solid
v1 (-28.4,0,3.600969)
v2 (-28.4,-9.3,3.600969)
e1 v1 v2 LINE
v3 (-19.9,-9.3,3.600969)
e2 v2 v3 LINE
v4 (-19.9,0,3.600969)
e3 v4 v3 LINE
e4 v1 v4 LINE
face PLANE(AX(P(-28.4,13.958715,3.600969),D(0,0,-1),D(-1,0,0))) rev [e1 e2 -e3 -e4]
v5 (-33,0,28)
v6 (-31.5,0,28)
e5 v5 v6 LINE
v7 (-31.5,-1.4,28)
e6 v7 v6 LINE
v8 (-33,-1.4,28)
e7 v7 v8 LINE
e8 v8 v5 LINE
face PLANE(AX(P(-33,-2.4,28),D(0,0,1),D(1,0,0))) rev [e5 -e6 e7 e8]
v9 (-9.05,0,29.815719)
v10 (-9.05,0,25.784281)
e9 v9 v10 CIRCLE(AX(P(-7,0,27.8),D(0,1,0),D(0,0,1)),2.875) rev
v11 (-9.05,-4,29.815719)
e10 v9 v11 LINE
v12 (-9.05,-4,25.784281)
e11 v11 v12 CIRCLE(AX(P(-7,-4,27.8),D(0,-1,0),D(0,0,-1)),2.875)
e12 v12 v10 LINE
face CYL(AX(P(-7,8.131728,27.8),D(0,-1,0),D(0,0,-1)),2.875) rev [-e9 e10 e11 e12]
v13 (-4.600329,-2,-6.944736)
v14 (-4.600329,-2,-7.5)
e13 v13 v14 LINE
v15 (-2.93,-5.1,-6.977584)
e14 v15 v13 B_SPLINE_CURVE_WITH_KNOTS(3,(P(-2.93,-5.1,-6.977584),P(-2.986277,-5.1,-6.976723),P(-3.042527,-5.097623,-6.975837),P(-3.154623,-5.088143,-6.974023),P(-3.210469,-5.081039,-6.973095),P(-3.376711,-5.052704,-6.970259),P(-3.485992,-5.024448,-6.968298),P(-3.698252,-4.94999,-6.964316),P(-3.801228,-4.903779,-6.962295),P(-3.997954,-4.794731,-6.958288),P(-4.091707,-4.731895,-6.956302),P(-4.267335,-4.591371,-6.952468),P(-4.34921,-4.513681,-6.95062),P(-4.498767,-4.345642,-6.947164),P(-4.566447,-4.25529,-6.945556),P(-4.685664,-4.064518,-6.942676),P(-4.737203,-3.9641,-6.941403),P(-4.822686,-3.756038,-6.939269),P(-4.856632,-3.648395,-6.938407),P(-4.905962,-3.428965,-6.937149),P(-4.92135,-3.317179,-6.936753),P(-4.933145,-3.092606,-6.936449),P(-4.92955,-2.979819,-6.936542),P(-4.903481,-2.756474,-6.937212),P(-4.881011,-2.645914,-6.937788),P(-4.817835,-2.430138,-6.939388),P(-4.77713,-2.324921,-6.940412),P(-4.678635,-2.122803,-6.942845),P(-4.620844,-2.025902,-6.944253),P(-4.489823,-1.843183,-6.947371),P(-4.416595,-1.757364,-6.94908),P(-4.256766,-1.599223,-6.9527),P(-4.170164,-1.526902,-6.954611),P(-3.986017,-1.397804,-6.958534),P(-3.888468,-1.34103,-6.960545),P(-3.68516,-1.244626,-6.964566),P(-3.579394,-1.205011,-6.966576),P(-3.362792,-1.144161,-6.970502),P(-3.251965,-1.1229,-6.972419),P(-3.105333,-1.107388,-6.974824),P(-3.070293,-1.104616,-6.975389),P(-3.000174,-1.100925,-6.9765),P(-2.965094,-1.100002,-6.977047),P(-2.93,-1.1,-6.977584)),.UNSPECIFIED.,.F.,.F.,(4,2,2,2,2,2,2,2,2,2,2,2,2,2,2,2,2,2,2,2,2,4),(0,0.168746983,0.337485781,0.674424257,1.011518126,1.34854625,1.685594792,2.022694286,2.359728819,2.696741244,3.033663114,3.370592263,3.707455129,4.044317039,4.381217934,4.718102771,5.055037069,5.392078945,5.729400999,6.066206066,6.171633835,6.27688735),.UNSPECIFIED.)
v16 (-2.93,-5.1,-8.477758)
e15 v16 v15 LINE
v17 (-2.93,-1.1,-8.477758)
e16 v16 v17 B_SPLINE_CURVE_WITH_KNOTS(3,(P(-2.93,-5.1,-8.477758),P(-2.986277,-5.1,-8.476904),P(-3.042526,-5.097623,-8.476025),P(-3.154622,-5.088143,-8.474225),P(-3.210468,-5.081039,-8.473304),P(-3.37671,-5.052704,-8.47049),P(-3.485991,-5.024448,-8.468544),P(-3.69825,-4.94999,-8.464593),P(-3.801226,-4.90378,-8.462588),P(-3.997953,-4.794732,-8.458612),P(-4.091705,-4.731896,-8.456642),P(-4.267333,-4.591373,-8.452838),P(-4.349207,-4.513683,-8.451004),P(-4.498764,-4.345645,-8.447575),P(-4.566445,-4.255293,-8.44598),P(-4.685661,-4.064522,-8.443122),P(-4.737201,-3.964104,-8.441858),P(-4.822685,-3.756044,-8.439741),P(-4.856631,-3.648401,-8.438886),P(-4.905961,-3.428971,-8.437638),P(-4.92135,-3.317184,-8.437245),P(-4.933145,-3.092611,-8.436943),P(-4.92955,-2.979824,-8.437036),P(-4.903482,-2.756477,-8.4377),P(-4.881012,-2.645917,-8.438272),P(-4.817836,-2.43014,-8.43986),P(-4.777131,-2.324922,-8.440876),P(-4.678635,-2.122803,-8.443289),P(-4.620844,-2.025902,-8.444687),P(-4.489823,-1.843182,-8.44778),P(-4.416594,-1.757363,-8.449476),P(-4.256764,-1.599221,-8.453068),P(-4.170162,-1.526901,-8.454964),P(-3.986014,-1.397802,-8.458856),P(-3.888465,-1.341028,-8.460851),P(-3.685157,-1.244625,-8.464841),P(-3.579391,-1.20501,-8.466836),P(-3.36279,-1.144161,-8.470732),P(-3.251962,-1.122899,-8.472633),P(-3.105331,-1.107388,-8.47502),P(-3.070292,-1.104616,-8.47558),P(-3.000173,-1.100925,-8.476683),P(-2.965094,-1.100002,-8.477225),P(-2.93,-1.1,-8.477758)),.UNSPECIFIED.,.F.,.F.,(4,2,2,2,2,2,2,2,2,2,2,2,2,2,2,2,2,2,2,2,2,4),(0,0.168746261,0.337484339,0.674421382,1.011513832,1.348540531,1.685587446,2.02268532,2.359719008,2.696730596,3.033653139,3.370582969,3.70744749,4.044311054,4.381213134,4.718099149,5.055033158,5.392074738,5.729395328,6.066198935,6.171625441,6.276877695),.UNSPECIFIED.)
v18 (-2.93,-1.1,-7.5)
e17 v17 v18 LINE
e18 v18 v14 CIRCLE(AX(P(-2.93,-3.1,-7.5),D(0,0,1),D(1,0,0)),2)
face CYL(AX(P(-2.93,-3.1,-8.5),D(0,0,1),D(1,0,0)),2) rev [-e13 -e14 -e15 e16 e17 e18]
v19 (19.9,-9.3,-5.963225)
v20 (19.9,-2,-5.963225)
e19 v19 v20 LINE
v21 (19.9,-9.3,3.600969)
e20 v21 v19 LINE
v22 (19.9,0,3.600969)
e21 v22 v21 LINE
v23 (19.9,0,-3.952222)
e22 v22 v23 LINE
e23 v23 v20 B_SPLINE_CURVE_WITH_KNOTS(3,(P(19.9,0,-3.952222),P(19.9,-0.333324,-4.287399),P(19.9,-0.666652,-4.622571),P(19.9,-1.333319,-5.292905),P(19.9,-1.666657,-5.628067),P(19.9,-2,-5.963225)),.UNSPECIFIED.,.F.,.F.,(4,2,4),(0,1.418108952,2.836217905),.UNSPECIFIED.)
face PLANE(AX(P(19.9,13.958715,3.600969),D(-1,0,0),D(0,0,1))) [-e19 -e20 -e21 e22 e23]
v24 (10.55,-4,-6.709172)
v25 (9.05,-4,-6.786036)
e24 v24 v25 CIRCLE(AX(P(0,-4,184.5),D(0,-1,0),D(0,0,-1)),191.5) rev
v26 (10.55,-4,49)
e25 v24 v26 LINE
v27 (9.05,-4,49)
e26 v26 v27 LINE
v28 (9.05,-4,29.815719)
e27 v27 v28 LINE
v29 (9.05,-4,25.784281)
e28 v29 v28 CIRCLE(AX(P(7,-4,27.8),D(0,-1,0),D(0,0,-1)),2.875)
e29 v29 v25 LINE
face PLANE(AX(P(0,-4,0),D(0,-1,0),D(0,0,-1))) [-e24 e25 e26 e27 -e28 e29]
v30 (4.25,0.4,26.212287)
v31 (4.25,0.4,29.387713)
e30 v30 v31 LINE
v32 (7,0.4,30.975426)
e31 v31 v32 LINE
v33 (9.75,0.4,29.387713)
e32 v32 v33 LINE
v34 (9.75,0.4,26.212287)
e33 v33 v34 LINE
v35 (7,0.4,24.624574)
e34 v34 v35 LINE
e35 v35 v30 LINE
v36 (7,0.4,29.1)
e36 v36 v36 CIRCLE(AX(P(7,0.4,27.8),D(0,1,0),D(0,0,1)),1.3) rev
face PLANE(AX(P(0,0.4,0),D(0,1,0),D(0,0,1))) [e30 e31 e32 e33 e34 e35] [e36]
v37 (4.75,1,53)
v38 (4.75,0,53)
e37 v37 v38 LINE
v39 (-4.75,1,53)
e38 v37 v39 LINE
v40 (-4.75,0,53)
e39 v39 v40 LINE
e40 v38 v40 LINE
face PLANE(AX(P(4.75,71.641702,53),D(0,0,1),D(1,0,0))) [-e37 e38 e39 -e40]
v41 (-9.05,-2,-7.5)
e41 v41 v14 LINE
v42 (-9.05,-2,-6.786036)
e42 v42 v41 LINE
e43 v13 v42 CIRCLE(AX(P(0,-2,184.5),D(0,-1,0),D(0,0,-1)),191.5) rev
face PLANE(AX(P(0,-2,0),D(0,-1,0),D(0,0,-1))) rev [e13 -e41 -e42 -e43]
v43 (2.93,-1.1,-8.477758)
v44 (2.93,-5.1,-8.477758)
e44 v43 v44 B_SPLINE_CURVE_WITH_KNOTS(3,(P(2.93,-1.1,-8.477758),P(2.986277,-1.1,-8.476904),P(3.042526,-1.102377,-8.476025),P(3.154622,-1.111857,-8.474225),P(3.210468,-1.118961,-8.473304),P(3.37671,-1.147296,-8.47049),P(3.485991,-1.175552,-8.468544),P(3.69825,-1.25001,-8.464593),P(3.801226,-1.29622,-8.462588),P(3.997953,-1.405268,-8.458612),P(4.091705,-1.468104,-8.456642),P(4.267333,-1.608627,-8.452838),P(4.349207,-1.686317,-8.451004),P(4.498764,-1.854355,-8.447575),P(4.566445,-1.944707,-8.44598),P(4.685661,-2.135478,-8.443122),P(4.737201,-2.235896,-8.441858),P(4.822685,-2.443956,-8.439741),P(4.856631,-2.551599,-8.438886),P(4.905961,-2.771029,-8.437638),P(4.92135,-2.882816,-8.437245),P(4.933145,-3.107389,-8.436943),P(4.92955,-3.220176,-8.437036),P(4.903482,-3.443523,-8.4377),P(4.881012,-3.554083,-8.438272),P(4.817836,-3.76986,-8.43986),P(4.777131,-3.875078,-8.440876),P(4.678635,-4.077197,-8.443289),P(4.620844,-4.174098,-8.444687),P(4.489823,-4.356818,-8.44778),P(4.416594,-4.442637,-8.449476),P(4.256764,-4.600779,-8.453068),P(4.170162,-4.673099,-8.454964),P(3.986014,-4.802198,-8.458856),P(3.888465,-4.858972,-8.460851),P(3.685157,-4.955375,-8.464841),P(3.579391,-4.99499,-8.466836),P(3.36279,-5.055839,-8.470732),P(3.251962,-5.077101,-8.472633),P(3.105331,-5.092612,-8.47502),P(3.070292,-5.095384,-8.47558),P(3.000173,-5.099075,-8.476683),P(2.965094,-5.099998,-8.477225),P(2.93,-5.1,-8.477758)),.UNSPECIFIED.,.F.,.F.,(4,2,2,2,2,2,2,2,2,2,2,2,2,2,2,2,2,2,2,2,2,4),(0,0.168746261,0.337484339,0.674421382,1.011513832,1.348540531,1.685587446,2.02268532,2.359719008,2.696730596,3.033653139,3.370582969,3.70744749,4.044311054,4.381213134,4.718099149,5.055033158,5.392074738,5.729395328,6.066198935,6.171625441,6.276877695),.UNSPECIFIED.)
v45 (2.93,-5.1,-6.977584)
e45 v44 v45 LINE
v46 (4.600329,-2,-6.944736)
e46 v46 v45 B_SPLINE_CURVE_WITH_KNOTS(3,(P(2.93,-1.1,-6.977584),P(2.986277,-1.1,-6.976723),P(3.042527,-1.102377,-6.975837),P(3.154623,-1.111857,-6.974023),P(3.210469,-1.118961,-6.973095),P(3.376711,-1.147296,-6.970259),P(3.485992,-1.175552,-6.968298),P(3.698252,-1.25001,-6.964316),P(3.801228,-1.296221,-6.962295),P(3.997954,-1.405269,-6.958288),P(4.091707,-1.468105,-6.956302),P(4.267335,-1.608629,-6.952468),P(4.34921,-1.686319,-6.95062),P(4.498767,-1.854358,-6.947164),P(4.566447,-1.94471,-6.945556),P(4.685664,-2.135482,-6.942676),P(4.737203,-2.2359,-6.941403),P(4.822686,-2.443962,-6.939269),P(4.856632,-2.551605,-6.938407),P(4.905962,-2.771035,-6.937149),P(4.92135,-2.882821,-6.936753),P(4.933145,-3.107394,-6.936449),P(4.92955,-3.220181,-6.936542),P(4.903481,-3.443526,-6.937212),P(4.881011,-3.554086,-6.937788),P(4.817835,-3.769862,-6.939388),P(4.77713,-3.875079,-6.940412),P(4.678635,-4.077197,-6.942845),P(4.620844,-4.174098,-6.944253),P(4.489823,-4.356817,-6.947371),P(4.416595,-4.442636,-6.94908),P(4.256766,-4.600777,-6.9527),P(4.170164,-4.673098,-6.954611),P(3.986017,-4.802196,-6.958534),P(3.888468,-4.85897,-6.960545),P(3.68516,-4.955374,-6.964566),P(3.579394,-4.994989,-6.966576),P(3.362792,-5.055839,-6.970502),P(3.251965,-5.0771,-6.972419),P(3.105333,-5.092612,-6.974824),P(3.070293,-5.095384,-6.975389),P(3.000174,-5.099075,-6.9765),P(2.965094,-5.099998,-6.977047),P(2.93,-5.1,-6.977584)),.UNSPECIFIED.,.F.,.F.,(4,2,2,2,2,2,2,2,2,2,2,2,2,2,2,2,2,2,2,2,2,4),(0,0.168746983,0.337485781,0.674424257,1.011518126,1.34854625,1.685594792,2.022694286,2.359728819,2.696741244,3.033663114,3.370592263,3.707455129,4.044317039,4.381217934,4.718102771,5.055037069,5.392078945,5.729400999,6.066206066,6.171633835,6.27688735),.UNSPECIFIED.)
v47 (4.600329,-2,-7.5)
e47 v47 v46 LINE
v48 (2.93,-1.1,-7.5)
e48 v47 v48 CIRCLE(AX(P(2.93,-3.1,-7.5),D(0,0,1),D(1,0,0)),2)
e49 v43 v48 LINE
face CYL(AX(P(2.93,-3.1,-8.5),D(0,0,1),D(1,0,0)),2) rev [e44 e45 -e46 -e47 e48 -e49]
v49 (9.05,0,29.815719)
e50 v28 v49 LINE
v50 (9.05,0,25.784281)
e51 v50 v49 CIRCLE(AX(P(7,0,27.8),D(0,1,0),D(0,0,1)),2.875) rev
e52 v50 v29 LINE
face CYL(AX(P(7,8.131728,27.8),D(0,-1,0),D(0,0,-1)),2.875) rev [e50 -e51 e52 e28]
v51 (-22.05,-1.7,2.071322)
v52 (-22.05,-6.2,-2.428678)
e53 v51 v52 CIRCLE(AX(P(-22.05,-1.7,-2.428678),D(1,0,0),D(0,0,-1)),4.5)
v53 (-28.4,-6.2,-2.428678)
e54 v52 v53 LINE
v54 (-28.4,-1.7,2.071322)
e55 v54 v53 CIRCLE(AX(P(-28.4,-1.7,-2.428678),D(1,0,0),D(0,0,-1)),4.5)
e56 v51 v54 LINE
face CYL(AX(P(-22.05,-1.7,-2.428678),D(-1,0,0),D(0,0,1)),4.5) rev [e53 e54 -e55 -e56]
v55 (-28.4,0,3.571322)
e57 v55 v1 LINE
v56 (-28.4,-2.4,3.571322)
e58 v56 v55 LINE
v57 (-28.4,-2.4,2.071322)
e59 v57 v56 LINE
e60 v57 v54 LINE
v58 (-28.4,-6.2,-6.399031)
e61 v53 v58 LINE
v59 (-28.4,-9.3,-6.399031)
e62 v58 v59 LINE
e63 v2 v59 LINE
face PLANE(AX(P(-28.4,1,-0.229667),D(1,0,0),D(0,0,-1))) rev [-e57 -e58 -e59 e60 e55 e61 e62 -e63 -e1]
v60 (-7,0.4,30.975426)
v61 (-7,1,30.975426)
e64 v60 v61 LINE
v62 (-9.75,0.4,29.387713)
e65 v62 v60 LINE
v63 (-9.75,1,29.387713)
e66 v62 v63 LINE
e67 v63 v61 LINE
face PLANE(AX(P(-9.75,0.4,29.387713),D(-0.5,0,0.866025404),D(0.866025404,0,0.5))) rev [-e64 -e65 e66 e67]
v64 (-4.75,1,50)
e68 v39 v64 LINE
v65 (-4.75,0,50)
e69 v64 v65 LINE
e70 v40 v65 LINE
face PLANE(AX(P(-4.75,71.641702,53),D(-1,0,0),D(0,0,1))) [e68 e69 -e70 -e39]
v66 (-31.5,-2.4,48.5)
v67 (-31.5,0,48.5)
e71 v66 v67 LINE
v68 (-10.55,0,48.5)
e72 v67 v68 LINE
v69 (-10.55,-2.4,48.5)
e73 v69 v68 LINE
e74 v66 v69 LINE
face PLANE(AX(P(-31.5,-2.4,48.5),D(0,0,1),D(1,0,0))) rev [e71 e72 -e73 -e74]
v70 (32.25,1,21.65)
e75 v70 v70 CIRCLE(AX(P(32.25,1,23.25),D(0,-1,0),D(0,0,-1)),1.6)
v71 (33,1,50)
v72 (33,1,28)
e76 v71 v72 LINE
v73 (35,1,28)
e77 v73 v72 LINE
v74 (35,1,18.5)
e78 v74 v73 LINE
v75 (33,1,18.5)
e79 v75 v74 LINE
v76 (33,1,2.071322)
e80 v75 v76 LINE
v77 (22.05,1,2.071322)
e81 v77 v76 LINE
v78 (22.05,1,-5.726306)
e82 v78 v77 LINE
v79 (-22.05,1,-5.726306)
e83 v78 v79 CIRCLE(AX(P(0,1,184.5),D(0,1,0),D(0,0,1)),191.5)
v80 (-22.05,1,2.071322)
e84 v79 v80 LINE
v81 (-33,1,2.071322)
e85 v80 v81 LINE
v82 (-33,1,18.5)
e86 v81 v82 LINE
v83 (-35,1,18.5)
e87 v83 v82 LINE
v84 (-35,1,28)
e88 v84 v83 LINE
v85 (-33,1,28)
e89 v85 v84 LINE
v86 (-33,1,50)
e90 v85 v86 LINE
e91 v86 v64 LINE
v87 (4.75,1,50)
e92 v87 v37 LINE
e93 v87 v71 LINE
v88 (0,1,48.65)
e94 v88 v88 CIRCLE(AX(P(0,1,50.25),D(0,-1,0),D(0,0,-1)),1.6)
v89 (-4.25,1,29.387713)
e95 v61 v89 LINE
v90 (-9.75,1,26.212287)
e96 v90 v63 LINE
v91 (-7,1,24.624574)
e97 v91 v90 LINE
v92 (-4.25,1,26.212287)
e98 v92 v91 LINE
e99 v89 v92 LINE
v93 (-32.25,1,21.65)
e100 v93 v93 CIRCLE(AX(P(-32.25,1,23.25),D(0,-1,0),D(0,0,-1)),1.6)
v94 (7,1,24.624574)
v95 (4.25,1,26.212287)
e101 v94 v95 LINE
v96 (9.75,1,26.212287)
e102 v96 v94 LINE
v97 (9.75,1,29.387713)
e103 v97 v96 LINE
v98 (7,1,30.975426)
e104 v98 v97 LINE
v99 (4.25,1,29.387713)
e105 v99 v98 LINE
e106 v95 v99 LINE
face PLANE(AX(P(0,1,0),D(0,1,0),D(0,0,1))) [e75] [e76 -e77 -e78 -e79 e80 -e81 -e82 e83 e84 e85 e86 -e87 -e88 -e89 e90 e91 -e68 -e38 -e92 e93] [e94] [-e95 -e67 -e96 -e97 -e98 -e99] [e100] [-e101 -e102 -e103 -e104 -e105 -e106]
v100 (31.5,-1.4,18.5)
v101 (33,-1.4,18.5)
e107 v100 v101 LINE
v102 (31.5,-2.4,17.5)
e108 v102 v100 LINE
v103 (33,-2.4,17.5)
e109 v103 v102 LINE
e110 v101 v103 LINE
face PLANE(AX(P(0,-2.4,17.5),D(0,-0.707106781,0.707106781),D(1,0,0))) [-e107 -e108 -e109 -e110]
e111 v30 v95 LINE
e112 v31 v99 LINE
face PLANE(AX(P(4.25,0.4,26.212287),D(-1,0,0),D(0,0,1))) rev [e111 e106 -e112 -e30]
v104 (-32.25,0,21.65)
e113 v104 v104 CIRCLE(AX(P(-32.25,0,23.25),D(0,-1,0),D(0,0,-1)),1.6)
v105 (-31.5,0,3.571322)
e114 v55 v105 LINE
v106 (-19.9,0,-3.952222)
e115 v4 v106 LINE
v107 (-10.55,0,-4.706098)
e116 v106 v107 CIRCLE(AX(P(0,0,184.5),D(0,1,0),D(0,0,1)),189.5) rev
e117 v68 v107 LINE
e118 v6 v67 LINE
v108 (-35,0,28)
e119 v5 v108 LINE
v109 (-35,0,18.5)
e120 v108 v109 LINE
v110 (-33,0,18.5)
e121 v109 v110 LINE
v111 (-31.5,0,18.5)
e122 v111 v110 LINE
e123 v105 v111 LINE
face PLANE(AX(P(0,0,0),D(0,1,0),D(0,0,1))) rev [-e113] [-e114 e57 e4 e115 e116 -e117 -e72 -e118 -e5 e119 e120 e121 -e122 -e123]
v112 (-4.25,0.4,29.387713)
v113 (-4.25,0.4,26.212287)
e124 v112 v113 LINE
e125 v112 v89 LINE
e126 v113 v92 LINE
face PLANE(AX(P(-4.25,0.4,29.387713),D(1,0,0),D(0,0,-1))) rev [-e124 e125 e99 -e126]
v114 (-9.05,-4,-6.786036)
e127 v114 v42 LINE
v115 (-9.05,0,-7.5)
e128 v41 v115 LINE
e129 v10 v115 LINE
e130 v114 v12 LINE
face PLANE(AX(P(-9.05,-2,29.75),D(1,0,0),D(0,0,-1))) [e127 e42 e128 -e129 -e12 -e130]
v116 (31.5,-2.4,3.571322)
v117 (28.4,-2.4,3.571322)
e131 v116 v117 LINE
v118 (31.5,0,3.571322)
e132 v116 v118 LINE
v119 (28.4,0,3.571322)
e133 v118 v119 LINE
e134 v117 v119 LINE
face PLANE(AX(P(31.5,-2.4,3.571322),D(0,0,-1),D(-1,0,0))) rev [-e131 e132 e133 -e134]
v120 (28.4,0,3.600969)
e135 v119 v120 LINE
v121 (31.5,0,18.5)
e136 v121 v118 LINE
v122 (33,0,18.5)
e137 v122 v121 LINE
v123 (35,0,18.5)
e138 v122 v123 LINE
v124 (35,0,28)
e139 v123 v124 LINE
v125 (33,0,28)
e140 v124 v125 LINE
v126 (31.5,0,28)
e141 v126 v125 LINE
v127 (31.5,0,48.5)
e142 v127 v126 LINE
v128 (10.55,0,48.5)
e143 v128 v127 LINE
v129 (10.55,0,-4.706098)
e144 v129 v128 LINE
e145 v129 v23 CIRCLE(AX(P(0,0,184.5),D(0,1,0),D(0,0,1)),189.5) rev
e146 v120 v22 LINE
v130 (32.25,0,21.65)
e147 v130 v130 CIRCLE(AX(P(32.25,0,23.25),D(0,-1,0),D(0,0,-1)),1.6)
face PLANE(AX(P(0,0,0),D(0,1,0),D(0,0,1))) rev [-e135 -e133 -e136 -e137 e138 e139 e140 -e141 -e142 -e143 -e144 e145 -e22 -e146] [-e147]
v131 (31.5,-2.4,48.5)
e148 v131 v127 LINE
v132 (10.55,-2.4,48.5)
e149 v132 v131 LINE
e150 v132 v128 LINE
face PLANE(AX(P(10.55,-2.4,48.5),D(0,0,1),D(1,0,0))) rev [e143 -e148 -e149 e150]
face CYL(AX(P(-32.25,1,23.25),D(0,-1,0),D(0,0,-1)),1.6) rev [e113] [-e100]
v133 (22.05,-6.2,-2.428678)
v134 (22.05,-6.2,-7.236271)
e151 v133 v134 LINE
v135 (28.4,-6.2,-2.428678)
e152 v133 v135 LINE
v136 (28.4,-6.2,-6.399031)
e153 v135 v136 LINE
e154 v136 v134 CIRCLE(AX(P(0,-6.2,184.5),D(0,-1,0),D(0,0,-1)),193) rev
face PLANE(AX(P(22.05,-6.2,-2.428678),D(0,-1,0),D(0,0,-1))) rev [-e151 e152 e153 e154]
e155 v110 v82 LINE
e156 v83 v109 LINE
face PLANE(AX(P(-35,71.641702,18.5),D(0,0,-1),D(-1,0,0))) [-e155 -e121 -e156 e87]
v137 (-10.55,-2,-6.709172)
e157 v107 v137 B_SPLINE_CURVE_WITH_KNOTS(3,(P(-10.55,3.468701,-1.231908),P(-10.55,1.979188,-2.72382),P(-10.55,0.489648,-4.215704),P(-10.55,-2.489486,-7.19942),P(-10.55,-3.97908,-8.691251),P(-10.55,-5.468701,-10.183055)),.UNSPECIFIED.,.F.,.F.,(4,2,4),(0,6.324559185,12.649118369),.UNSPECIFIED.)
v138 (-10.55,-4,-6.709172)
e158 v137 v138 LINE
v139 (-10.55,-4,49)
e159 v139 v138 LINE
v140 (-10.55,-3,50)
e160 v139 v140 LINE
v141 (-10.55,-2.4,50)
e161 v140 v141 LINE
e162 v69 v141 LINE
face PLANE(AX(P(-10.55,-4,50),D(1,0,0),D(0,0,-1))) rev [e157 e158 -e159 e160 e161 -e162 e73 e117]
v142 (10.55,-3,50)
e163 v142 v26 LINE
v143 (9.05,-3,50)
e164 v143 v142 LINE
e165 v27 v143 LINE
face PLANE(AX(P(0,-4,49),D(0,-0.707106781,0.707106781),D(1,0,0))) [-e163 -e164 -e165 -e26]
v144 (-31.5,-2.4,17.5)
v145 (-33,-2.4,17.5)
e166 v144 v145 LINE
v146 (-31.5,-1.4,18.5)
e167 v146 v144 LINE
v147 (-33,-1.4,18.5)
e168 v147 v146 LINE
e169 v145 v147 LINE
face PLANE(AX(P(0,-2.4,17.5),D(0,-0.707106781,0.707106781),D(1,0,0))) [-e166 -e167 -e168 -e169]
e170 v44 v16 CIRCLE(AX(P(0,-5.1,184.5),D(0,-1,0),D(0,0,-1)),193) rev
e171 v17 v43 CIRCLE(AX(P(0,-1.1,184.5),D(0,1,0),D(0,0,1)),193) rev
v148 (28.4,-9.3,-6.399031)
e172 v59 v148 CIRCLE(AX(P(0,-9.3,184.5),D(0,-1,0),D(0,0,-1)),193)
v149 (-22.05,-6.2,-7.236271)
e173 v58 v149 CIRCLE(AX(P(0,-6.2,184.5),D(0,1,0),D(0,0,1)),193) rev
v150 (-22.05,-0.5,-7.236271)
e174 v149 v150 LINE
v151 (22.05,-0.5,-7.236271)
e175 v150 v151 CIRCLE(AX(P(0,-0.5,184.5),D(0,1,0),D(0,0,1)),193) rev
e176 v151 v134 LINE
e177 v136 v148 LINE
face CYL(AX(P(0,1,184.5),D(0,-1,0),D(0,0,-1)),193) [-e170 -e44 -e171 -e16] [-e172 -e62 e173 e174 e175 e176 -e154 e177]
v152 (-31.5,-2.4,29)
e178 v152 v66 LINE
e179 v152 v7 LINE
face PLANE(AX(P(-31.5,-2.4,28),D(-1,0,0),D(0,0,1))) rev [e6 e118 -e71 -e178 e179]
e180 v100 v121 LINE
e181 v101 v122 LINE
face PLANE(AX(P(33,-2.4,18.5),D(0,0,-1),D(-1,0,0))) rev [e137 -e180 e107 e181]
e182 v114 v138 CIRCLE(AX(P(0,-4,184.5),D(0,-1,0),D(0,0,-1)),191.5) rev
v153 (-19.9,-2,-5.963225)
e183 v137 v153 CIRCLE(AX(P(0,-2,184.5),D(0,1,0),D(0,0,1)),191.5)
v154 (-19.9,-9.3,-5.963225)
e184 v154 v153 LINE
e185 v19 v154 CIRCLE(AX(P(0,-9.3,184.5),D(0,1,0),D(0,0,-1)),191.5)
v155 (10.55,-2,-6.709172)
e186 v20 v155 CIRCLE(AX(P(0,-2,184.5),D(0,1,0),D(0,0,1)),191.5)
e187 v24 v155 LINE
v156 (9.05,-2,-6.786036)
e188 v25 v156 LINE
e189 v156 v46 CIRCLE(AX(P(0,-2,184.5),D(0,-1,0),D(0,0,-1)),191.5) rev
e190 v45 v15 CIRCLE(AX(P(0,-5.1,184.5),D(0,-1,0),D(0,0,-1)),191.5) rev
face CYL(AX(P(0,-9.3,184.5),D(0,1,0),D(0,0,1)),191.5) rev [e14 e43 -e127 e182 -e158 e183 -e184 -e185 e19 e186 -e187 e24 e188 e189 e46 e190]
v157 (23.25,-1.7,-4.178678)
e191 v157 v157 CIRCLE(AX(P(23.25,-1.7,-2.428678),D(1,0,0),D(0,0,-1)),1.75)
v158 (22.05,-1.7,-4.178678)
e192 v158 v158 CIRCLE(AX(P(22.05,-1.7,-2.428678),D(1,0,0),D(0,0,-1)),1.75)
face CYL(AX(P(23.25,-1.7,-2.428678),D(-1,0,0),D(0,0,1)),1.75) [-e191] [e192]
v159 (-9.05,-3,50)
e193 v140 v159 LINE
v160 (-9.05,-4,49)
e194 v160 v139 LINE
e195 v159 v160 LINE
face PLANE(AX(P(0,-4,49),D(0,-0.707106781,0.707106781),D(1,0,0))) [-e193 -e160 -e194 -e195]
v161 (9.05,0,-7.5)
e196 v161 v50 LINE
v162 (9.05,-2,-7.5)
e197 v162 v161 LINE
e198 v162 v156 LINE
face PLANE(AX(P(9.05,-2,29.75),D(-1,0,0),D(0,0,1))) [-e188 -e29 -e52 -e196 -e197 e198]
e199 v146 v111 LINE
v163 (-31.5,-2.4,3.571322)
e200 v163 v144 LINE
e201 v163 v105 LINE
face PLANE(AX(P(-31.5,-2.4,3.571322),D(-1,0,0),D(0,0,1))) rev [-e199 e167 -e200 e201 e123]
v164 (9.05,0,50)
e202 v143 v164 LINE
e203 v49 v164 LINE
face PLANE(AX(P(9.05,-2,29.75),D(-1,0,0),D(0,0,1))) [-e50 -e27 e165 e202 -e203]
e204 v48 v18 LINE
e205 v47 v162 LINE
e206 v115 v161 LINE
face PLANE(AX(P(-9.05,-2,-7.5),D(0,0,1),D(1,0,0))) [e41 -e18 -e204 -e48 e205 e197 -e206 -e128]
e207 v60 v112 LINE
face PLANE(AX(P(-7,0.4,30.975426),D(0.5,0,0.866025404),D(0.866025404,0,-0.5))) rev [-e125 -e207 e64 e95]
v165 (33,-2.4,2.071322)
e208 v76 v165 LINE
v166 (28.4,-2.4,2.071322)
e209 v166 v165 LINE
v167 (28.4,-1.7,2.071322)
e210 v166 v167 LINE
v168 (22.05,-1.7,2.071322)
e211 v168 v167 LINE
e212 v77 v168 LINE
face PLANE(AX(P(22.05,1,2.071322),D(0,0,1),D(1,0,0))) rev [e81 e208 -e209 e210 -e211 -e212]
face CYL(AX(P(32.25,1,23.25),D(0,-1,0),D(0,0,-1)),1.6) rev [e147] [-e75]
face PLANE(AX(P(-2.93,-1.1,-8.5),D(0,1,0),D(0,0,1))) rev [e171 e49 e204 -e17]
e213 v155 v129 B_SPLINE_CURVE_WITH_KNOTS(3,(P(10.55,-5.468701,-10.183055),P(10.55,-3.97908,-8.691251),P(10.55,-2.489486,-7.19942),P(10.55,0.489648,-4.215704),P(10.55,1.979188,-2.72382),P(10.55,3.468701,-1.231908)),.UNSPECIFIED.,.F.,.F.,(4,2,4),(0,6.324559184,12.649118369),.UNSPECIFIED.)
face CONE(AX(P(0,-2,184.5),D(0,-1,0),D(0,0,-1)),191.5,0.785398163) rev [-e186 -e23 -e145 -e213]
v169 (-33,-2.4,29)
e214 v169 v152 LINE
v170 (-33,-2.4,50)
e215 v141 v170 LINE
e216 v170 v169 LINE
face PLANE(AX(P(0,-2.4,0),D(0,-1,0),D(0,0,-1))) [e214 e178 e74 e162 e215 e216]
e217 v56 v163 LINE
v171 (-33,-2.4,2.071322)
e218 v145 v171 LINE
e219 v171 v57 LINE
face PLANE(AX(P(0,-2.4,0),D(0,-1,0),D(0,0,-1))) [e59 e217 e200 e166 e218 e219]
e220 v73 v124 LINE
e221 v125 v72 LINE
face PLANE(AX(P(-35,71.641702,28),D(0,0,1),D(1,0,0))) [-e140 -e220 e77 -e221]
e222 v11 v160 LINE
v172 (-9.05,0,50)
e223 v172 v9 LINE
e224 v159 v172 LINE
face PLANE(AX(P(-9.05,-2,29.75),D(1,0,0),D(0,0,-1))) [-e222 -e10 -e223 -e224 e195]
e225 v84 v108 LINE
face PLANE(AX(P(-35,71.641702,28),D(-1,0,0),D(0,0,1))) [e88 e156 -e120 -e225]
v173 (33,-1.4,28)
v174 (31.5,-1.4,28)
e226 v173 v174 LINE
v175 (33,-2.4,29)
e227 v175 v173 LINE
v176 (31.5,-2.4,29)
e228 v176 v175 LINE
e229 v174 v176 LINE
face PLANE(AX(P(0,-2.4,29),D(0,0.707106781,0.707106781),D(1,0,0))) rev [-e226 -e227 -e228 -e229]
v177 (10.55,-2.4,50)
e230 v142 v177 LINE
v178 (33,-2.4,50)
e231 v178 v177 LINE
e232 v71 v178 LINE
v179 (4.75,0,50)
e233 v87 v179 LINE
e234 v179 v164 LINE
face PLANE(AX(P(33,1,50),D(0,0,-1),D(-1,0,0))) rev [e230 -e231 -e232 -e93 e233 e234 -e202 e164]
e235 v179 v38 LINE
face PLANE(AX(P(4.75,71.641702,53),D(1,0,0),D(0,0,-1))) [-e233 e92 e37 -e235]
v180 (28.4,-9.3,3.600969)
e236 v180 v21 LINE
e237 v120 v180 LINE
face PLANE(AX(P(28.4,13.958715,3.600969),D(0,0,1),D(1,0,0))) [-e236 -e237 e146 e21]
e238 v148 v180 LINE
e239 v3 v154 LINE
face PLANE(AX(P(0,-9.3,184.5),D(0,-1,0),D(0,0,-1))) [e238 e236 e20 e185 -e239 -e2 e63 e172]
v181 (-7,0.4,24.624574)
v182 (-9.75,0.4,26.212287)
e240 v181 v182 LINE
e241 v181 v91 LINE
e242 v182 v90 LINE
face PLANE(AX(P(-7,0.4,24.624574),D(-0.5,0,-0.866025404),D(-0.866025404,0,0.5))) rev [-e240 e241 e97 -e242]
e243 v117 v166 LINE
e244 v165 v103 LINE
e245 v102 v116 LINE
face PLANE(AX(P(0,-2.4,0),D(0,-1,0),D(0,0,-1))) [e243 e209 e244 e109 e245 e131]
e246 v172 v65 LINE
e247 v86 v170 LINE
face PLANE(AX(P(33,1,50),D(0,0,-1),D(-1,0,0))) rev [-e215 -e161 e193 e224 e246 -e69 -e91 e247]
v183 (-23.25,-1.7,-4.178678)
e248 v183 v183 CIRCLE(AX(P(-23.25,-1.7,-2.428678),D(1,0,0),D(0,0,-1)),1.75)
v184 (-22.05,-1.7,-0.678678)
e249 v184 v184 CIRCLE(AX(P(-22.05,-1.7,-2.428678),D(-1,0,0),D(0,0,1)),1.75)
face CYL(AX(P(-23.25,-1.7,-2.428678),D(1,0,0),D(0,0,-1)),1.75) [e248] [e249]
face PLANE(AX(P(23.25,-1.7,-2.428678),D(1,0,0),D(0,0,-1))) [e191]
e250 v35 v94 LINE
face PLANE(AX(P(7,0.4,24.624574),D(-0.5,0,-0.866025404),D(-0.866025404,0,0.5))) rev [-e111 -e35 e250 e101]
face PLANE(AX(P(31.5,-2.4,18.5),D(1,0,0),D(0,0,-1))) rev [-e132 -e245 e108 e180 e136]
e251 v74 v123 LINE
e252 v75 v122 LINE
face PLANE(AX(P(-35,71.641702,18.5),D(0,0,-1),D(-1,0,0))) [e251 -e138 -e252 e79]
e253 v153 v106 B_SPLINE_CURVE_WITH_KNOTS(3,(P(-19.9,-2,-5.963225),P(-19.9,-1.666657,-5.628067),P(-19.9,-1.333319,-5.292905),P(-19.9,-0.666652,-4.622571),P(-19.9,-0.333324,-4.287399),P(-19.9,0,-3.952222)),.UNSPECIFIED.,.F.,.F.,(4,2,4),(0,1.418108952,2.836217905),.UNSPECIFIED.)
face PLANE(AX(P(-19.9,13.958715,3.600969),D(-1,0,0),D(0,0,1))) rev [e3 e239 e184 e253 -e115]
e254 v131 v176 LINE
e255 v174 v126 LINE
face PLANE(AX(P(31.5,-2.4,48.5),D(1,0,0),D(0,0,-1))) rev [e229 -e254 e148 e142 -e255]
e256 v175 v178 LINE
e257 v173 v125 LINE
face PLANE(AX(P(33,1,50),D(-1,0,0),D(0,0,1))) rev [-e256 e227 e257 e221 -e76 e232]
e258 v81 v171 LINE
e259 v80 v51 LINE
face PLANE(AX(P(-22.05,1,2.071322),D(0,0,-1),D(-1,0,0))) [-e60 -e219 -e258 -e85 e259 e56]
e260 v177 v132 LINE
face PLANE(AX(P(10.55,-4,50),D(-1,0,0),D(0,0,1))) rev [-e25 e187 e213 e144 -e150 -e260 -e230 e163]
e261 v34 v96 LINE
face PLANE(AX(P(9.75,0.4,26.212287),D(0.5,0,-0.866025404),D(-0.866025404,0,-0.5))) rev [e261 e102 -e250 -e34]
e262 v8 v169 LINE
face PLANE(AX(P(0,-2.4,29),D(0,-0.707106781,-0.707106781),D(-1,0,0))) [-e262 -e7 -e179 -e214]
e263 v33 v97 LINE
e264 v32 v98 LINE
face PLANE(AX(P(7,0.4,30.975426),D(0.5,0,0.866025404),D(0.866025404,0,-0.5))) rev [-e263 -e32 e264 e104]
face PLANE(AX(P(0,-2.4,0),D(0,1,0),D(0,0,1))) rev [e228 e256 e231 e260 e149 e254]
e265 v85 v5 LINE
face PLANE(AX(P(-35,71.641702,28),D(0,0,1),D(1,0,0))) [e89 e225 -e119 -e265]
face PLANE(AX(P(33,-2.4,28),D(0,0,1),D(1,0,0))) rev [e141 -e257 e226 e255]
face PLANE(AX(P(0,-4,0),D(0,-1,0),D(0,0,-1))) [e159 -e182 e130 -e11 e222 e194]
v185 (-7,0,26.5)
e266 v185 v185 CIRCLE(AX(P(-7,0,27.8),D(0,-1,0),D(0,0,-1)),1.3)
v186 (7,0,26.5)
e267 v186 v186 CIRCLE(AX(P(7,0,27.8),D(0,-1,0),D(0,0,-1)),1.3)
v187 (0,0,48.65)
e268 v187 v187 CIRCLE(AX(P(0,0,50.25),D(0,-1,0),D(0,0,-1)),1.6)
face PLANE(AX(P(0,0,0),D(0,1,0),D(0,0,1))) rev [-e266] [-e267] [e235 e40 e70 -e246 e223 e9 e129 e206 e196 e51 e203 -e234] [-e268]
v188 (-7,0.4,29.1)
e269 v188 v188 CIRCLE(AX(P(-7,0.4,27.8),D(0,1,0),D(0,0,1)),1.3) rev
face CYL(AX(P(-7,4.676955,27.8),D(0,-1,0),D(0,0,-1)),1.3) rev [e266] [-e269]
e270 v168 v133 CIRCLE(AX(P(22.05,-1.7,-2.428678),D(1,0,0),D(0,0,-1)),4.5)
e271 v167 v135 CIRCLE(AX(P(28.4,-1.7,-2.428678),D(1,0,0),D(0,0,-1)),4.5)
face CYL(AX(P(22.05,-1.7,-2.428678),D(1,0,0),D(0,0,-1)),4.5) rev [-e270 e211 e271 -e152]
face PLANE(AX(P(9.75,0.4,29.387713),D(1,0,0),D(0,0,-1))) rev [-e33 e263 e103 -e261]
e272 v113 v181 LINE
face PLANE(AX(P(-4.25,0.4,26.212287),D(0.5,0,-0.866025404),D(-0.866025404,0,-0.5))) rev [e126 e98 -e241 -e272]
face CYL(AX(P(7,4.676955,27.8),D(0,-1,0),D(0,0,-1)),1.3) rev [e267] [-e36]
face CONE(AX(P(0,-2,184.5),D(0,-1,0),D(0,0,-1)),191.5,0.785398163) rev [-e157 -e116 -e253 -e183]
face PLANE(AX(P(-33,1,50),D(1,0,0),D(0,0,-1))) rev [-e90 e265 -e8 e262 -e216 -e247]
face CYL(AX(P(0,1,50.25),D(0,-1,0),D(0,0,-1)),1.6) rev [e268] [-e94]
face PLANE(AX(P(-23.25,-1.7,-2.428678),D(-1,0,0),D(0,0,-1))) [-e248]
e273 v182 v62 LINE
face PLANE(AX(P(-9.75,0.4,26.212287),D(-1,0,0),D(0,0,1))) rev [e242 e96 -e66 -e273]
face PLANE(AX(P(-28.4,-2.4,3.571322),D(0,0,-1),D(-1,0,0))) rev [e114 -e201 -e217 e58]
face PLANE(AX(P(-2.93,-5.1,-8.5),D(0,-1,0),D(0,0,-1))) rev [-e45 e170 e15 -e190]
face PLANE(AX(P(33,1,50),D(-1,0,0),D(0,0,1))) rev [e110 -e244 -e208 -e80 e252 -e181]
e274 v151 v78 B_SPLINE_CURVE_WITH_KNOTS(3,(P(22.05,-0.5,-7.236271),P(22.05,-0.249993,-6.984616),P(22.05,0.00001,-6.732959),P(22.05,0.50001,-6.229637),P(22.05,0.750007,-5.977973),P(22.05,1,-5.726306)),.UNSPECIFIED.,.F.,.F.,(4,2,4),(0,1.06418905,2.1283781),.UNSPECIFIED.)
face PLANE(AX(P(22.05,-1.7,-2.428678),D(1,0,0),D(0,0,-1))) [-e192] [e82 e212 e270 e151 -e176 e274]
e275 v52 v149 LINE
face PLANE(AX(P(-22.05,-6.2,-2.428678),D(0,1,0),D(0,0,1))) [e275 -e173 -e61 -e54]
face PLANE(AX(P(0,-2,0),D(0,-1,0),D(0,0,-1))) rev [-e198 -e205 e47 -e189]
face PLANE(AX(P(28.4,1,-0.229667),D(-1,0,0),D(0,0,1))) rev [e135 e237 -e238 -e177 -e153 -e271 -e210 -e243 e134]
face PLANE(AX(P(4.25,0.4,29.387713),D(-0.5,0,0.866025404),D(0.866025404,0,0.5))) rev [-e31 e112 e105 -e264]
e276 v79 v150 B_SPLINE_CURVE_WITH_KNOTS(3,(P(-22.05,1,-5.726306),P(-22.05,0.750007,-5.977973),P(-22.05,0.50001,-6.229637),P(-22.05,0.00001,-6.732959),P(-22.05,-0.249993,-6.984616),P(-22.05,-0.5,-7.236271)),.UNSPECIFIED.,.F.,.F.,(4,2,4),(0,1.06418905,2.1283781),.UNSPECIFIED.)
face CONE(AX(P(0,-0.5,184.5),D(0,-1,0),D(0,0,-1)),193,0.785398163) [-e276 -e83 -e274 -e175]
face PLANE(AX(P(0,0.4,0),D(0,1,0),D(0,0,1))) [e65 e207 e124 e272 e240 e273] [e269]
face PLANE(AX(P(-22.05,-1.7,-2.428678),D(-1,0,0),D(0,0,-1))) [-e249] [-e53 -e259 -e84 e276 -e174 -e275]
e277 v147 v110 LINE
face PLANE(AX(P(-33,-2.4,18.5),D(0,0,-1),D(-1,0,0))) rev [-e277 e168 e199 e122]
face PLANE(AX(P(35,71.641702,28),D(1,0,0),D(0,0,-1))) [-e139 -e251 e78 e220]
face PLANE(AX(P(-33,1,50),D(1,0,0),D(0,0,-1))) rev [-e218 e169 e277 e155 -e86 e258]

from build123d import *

# Parameters (mm, degrees)
SKETCH1_W            = 66
SKETCH1_H            = 100
BOSS_EXTRUDE1_DEPTH  = 1
CUT_EXTRUDE1_START   = -1
CUT_EXTRUDE1_DEPTH   = 1
CUT_EXTRUDE2_DEPTH   = 60.916608716
SKETCH4_W            = 70
SKETCH4_H            = 9.5
SKETCH4_W_2          = 9.5
SKETCH4_H_2          = 3
BOSS_EXTRUDE2_DEPTH  = 1
SKETCH5_R            = 1.6
CUT_EXTRUDE3_DEPTH   = 64.521649853
BOSS_EXTRUDE3_DEPTH  = 9.3
SKETCH7_W            = 18.1
SKETCH7_H            = 37.25
CUT_EXTRUDE4_DEPTH   = 2
SKETCH8_W            = 0.75
SKETCH8_H            = 35
BOSS_EXTRUDE4_DEPTH  = 1.9
SKETCH10_W           = 19.6
SKETCH10_H           = 14.249078429
CUT_EXTRUDE5_DEPTH   = 1.9
CUT_EXTRUDE6_DEPTH   = 65.191042989
BOSS_EXTRUDE7_START  = -9.3
BOSS_EXTRUDE7_DEPTH  = 9.3
BOSS_EXTRUDE8_START  = -9.3
BOSS_EXTRUDE8_DEPTH  = 9.3
CUT_EXTRUDE7_DEPTH   = 6.35
SKETCH18_R           = 1.75
BOSS_EXTRUDE9_DEPTH  = 1.2
CHAMFER1_SIZE        = 2
CHAMFER1_SIZE_2      = 1.753861884
CHAMFER2_SIZE        = 1.5
CHAMFER3_SIZE        = 2
CUT_EXTRUDE8_DEPTH   = 1
SKETCH20_W           = 1.5
SKETCH20_H           = 56.786035821
BOSS_EXTRUDE10_DEPTH = 4
BOSS_EXTRUDE11_DEPTH = 2.4
CHAMFER4_SIZE        = 1
SKETCH22_R           = 1.3
CUT_EXTRUDE9_DEPTH   = 1
SKETCH23_R           = 2.875
CUT_EXTRUDE10_DEPTH  = 4
CUT_EXTRUDE11_DEPTH  = 0.6


with BuildPart() as part:
    # Sketch1 → Boss-Extrude1 (new body)
    with BuildSketch(Plane(origin=(0, 0, 0), x_dir=(1, 0, 0), z_dir=(0, 1, 0))):
        Rectangle(SKETCH1_W, SKETCH1_H)
    extrude(amount=BOSS_EXTRUDE1_DEPTH)

    # Cut-Extrude1: read off the stored shape, not the designer's step
    # Cut-Extrude1 outline → Cut-Extrude1 (cut)
    with BuildSketch(Plane.XZ.offset(CUT_EXTRUDE1_START)):
        with BuildLine():
            ThreePointArc((33, 0.434794163), (30.75228798, 0.045949397), (28.5, -0.315448488))
            Line((28.5, -0.315448488), (28.5, -6.384127156))
            ThreePointArc((28.5, -6.384127156), (0, -8.5), (-28.5, -6.384127156))
            Line((-28.5, -6.384127156), (-28.5, -0.315448488))
            ThreePointArc((-28.5, -0.315448488), (-30.75228798, 0.045949397), (-33, 0.434794163))
            Line((-33, 0.434794163), (-33, -50))
            Line((-33, -50), (33, -50))
            Line((33, -50), (33, 0.434794163))
        make_face()
    extrude(amount=CUT_EXTRUDE1_DEPTH, mode=Mode.SUBTRACT)

    # Sketch3 → Cut-Extrude2 (cut, through all)
    with BuildSketch(Plane.XZ):
        with BuildLine():
            Line((-28.5, -0.315448488), (-28.5, -6.384127156))
            ThreePointArc((-28.5, -6.384127156), (-28.450000976, -6.391585578), (-28.4, -6.399030904))
            Line((-28.4, -6.399030904), (-28.4, -0.229667352))
            ThreePointArc((-28.4, -0.229667352), (-30.702389333, 0.139013646), (-33, 0.536389468))
            Line((-33, 0.536389468), (-33, 0.434794163))
            ThreePointArc((-33, 0.434794163), (-30.75228798, 0.045949397), (-28.5, -0.315448488))
        make_face()
        with BuildLine():
            Line((33, 0.536389468), (33, 0.434794163))
            ThreePointArc((33, 0.434794163), (30.75228798, 0.045949397), (28.5, -0.315448488))
            Line((28.5, -0.315448488), (28.5, -6.384127156))
            ThreePointArc((28.5, -6.384127156), (28.450000976, -6.391585578), (28.4, -6.399030904))
            Line((28.4, -6.399030904), (28.4, -0.229667352))
            ThreePointArc((28.4, -0.229667352), (30.702389333, 0.139013646), (33, 0.536389468))
        make_face()
    extrude(amount=-CUT_EXTRUDE2_DEPTH, mode=Mode.SUBTRACT)

    # Sketch4 → Boss-Extrude2 (add)
    with BuildSketch(Plane(origin=(0, 0, 0), x_dir=(-1, 0, 0), z_dir=(0, -1, 0))):
        with Locations((0, -23.25)):
            Rectangle(SKETCH4_W, SKETCH4_H)
        with Locations((0, -51.5)):
            Rectangle(SKETCH4_W_2, SKETCH4_H_2)
    extrude(amount=-BOSS_EXTRUDE2_DEPTH)

    # Sketch5 → Cut-Extrude3 (cut, through all)
    with BuildSketch(Plane.XZ):
        with Locations(Location((32.25, 23.25, 0), (0, 0, 270))):
            Circle(SKETCH5_R)
        with Locations(Location((-32.25, 23.25, 0), (0, 0, 270))):
            Circle(SKETCH5_R)
        with Locations(Location((0, 50.25, 0), (0, 0, 270))):
            Circle(SKETCH5_R)
    extrude(amount=-CUT_EXTRUDE3_DEPTH, mode=Mode.SUBTRACT)

    # Sketch6 → Boss-Extrude3 (add)
    with BuildSketch(Plane.XZ):
        with BuildLine():
            Line((28.4, -4.882390945), (28.4, -6.399030904))
            ThreePointArc((28.4, -6.399030904), (0, -8.5), (-28.4, -6.399030904))
            Line((-28.4, -6.399030904), (-28.4, -4.882390945))
            ThreePointArc((-28.4, -4.882390945), (0, -7), (28.4, -4.882390945))
        make_face()
    extrude(amount=BOSS_EXTRUDE3_DEPTH)

    # Sketch7 → Cut-Extrude4 (cut)
    with BuildSketch(Plane.XZ):
        with Locations((0, 11.125)):
            Rectangle(SKETCH7_W, SKETCH7_H)
    extrude(amount=CUT_EXTRUDE4_DEPTH, mode=Mode.SUBTRACT)

    # Sketch8 → Boss-Extrude4 (add)
    with BuildSketch(Plane.XZ):
        with Locations((-9.425, 10)):
            Rectangle(SKETCH8_W, SKETCH8_H)
        with Locations((9.425, 10)):
            Rectangle(SKETCH8_W, SKETCH8_H)
    extrude(amount=BOSS_EXTRUDE4_DEPTH)

    # Sketch10 → Cut-Extrude5 (cut)
    with BuildSketch(Plane.XZ):
        with Locations((0, 10.375460785)):
            Rectangle(SKETCH10_W, SKETCH10_H)
    extrude(amount=CUT_EXTRUDE5_DEPTH, mode=Mode.SUBTRACT)

    # Sketch12 → Cut-Extrude6 (cut, through all)
    with BuildSketch(Plane.XY):
        with BuildLine():
            Line((-2.93, -1.1), (2.93, -1.1))
            ThreePointArc((2.93, -1.1), (4.93, -3.1), (2.93, -5.1))
            Line((2.93, -5.1), (-2.93, -5.1))
            ThreePointArc((-2.93, -5.1), (-4.93, -3.1), (-2.93, -1.1))
        make_face()
    extrude(amount=-CUT_EXTRUDE6_DEPTH, mode=Mode.SUBTRACT)

    # Sketch14 → Boss-Extrude7 (add)
    with BuildSketch(Plane.XZ.offset(9.3).offset(BOSS_EXTRUDE7_START)):
        with BuildLine():
            Line((-28.4, -6.399030904), (-28.4, -0.229667352))
            Line((-28.4, -0.229667352), (-27.4, -0.229667352))
            Line((-27.4, -0.229667352), (-27.4, -6.545125559))
            ThreePointArc((-27.4, -6.545125559), (-27.900095626, -6.472732776), (-28.4, -6.399030904))
        make_face()
    boss_extrude7 = extrude(amount=BOSS_EXTRUDE7_DEPTH)

    # Mirror1: Boss-Extrude7 across plane
    add(boss_extrude7.mirror(Plane(origin=(0, 0, 0), x_dir=(0, 0, 1), z_dir=(1, 0, 0))))

    # Sketch16 → Boss-Extrude8 (add)
    with BuildSketch(Plane.XZ.offset(9.3).offset(BOSS_EXTRUDE8_START)):
        with BuildLine():
            Line((28.4, -6.399030904), (28.4, 3.600969096))
            Line((28.4, 3.600969096), (19.9, 3.600969096))
            Line((19.9, 3.600969096), (19.9, -7.471325984))
            ThreePointArc((19.9, -7.471325984), (24.155950699, -6.982349176), (28.4, -6.399030904))
        make_face()
    boss_extrude8 = extrude(amount=BOSS_EXTRUDE8_DEPTH)

    # Sketch17 → Cut-Extrude7 (cut)
    with BuildSketch(Plane(origin=(28.4, 0, 0), x_dir=(0, 0, -1), z_dir=(1, 0, 0))):
        with BuildLine():
            Line((2.428677783, -6.2), (8.5, -6.2))
            Line((8.5, -6.2), (8.5, 1))
            Line((8.5, 1), (-2.071322217, 1))
            Line((-2.071322217, 1), (-2.071322217, -1.7))
            ThreePointArc((-2.071322217, -1.7), (-0.753302732, -4.881980515), (2.428677783, -6.2))
        make_face()
    cut_extrude7 = extrude(amount=-CUT_EXTRUDE7_DEPTH, mode=Mode.SUBTRACT)

    # Sketch18 → Boss-Extrude9 (add)
    with BuildSketch(Plane(origin=(22.05, 0, 0), x_dir=(0, 0, -1), z_dir=(1, 0, 0))):
        with Locations((2.428677783, -1.7)):
            Circle(SKETCH18_R)
    boss_extrude9 = extrude(amount=BOSS_EXTRUDE9_DEPTH)

    # Mirror5: Boss-Extrude8, Cut-Extrude7, Boss-Extrude9 across plane
    add(boss_extrude8.mirror(Plane(origin=(0, 0, 0), x_dir=(0, 0, 1), z_dir=(1, 0, 0))))
    add(cut_extrude7.mirror(Plane(origin=(0, 0, 0), x_dir=(0, 0, 1), z_dir=(1, 0, 0))), mode=Mode.SUBTRACT)
    add(boss_extrude9.mirror(Plane(origin=(0, 0, 0), x_dir=(0, 0, 1), z_dir=(1, 0, 0))))

    # Chamfer1
    # the kernel refuses this chamfer: 2, 1.753861884 mm, written as the material it takes off along each edge
    with BuildSketch(Plane(origin=(-28.4, -5.143365976, -0.229667352), x_dir=(0, 0, 1), z_dir=(0, 1, 0))) as chamfer1_piece_1:
        with BuildLine():
            Line((CHAMFER1_SIZE, 0), (0.273671674, -1.726328326))
            ThreePointArc((0.273671674, -1.726328326), (0.138499154, -0.886697037), (0, 0))
            Line((0, 0), (CHAMFER1_SIZE, 0))
        make_face()
    extrude(amount=11.286731952, mode=Mode.SUBTRACT)
    with BuildSketch(Plane(origin=(28.4, -5.116242352, -0.229667352), x_dir=(0.987565010261834, 0, 0.1572111653367653), z_dir=(0, 1, 0))) as chamfer1_piece_2:
        with BuildLine():
            Line((1.989439971, 0), (CHAMFER1_SIZE_2 * 0.157211165371, -CHAMFER1_SIZE_2 * 0.987565010478))
            Line((CHAMFER1_SIZE_2 * 0.157211165371, -CHAMFER1_SIZE_2 * 0.987565010478), (0, 0))
            ThreePointArc((0, 0), (1.02284944, 0.002644953), (1.989439971, 0))
        make_face()
    extrude(amount=11.232484704, mode=Mode.SUBTRACT)

    # Chamfer2
    chamfer2_edges = [part.edges().sort_by_distance(p)[0] for p in [
        (0, 1, -8.5),
    ]]
    chamfer(chamfer2_edges, length=CHAMFER2_SIZE)

    # Chamfer3
    # the kernel refuses this chamfer: 2 mm, written as the material it adds along each edge
    with BuildSketch(Plane(origin=(0, 0, 184.5), x_dir=(-0.1305886688100571, 0, -0.9914366341720571), z_dir=(-0.9914366341720571, 0, 0.1305886688100571))) as chamfer3_piece_1_section:
        Polygon((191.5 - CHAMFER3_SIZE, 0), (191.5, CHAMFER3_SIZE), (191.5, 0), align=None)
    chamfer3_piece_1 = revolve(axis=Axis((0, 0, 184.5), (0, -1, 0)), revolution_arc=6.10908985, mode=Mode.PRIVATE)
    chamfer3_piece_1 = split(chamfer3_piece_1, bisect_by=Plane(origin=(-9.8, 0, 184.5), z_dir=(-1, 0, 0)), keep=Keep.TOP, mode=Mode.PRIVATE)
    chamfer3_piece_1 = split(chamfer3_piece_1, bisect_by=Plane(origin=(-19.9, 0, 184.5), z_dir=(1, 0, 0)), keep=Keep.TOP, mode=Mode.PRIVATE)
    chamfer3_piece_1 = split(chamfer3_piece_1, bisect_by=Plane(origin=(0, -2, 184.5), z_dir=(0, 1, 0)), keep=Keep.TOP, mode=Mode.PRIVATE)
    add(chamfer3_piece_1)
    with BuildSketch(Plane(origin=(0, 0, 184.5), x_dir=(-0.1305886688100571, 0, -0.9914366341720571), z_dir=(-0.9914366341720571, 0, 0.1305886688100571))) as chamfer3_piece_2_section:
        Polygon((191.5 - CHAMFER3_SIZE, 0), (191.5, CHAMFER3_SIZE), (191.5, 0), align=None)
    chamfer3_piece_2 = revolve(axis=Axis((0, 0, 184.5), (0, -1, 0)), revolution_arc=6.10908985, mode=Mode.PRIVATE)
    chamfer3_piece_2 = split(chamfer3_piece_2, bisect_by=Plane(origin=(-9.8, 0, 184.5), z_dir=(1, 0, 0)), keep=Keep.TOP, mode=Mode.PRIVATE)
    chamfer3_piece_2 = split(chamfer3_piece_2, bisect_by=Plane(origin=(-9.05, 0, 184.5), z_dir=(-1, 0, 0)), keep=Keep.TOP, mode=Mode.PRIVATE)
    chamfer3_piece_2 = split(chamfer3_piece_2, bisect_by=Plane(origin=(0, -2, 184.5), z_dir=(0, 1, 0)), keep=Keep.TOP, mode=Mode.PRIVATE)
    add(chamfer3_piece_2)
    with BuildSketch(Plane(origin=(0, 0, 184.5), x_dir=(0.0243365747300663, 0, -0.9997038217044125), z_dir=(-0.9997038217044125, 0, -0.0243365747300663))) as chamfer3_piece_3_section:
        Polygon((191.5 - CHAMFER3_SIZE, 0), (191.5, CHAMFER3_SIZE), (191.5, 0), align=None)
    chamfer3_piece_3 = revolve(axis=Axis((0, 0, 184.5), (0, -1, 0)), revolution_arc=6.10908985, mode=Mode.PRIVATE)
    chamfer3_piece_3 = split(chamfer3_piece_3, bisect_by=Plane(origin=(9.8, 0, 184.5), z_dir=(-1, 0, 0)), keep=Keep.TOP, mode=Mode.PRIVATE)
    chamfer3_piece_3 = split(chamfer3_piece_3, bisect_by=Plane(origin=(0, -2, 184.5), z_dir=(0, 1, 0)), keep=Keep.TOP, mode=Mode.PRIVATE)
    chamfer3_piece_3 = split(chamfer3_piece_3, bisect_by=Plane(origin=(9.05, 0, 184.5), z_dir=(1, 0, 0)), keep=Keep.TOP, mode=Mode.PRIVATE)
    add(chamfer3_piece_3)
    with BuildSketch(Plane(origin=(0, 0, 184.5), x_dir=(0.0243365747300663, 0, -0.9997038217044125), z_dir=(-0.9997038217044125, 0, -0.0243365747300663))) as chamfer3_piece_4_section:
        Polygon((191.5 - CHAMFER3_SIZE, 0), (191.5, CHAMFER3_SIZE), (191.5, 0), align=None)
    chamfer3_piece_4 = revolve(axis=Axis((0, 0, 184.5), (0, -1, 0)), revolution_arc=6.10908985, mode=Mode.PRIVATE)
    chamfer3_piece_4 = split(chamfer3_piece_4, bisect_by=Plane(origin=(19.9, 0, 184.5), z_dir=(-1, 0, 0)), keep=Keep.TOP, mode=Mode.PRIVATE)
    chamfer3_piece_4 = split(chamfer3_piece_4, bisect_by=Plane(origin=(9.8, 0, 184.5), z_dir=(1, 0, 0)), keep=Keep.TOP, mode=Mode.PRIVATE)
    chamfer3_piece_4 = split(chamfer3_piece_4, bisect_by=Plane(origin=(0, -2, 184.5), z_dir=(0, 1, 0)), keep=Keep.TOP, mode=Mode.PRIVATE)
    add(chamfer3_piece_4)

    # Sketch19 → Cut-Extrude8 (cut)
    with BuildSketch(Plane.XZ):
        with BuildLine():
            Line((-28.4, 2.071322217), (-33, 2.071322217))
            Line((-33, 2.071322217), (-33, 0.536389468))
            ThreePointArc((-33, 0.536389468), (-31.564124299, 0.284593323), (-30.126328326, 0.044004322))
            Line((-30.126328326, 0.044004322), (-28.4, 1.770332648))
            Line((-28.4, 1.770332648), (-28.4, 2.071322217))
        make_face()
        with BuildLine():
            Line((33, 2.071322217), (33, 0.536389468))
            ThreePointArc((33, 0.536389468), (31.68316133, 0.305029145), (30.364701305, 0.083094824))
            Line((30.364701305, 0.083094824), (28.4, 1.524194532))
            Line((28.4, 1.524194532), (28.4, 2.071322217))
            Line((28.4, 2.071322217), (33, 2.071322217))
        make_face()
    extrude(amount=-CUT_EXTRUDE8_DEPTH, mode=Mode.SUBTRACT)

    # Sketch20 → Boss-Extrude10 (add)
    with BuildSketch(Plane.XZ):
        with Locations((-9.8, 21.60698209)):
            Rectangle(SKETCH20_W, SKETCH20_H)
        with Locations((9.8, 21.60698209)):
            Rectangle(SKETCH20_W, SKETCH20_H)
    extrude(amount=BOSS_EXTRUDE10_DEPTH)

    # Sketch21 → Boss-Extrude11 (add)
    with BuildSketch(Plane.XZ):
        Polygon((33, 50), (33, 28), (31.5, 28), (31.5, 48.5), (10.55, 48.5), (10.55, 50), align=None)
        Polygon((-33, 28), (-33, 50), (-10.55, 50), (-10.55, 48.5), (-31.5, 48.5), (-31.5, 28), align=None)
        Polygon((33, 18.5), (33, 2.071322217), (28.4, 2.071322217), (28.4, 3.571322217), (31.5, 3.571322217), (31.5, 18.5), align=None)
        Polygon((-28.4, 2.071322217), (-33, 2.071322217), (-33, 18.5), (-31.5, 18.5), (-31.5, 3.571322217), (-28.4, 3.571322217), align=None)
    extrude(amount=BOSS_EXTRUDE11_DEPTH)

    # Chamfer4
    chamfer4_edges = [part.edges().sort_by_distance(p)[0] for p in [
        (-9.8, -4, 50),
        (9.8, -4, 50),
        (32.25, -2.4, 28),
        (-32.25, -2.4, 28),
        (32.25, -2.4, 18.5),
        (-32.25, -2.4, 18.5),
    ]]
    chamfer(chamfer4_edges, length=CHAMFER4_SIZE)

    # Sketch22 → Cut-Extrude9 (cut)
    with BuildSketch(Plane.XZ):
        with Locations(Location((-7, 27.8, 0), (0, 0, 270))):
            Circle(SKETCH22_R)
        with Locations(Location((7, 27.8, 0), (0, 0, 270))):
            Circle(SKETCH22_R)
    extrude(amount=-CUT_EXTRUDE9_DEPTH, mode=Mode.SUBTRACT)

    # Sketch23 → Cut-Extrude10 (cut)
    with BuildSketch(Plane.XZ.offset(4)):
        with Locations((-7, 27.8)):
            Circle(SKETCH23_R)
        with Locations((7, 27.8)):
            Circle(SKETCH23_R)
    extrude(amount=-CUT_EXTRUDE10_DEPTH, mode=Mode.SUBTRACT)

    # Sketch24 → Cut-Extrude11 (cut)
    with BuildSketch(Plane(origin=(0, 1, 0), x_dir=(1, 0, 0), z_dir=(0, 1, 0))):
        Polygon((-9.75, -26.21228676), (-9.75, -29.38771324), (-7, -30.975426481), (-4.25, -29.38771324), (-4.25, -26.21228676), (-7, -24.624573519), align=None)
        Polygon((7, -24.624573519), (4.25, -26.21228676), (4.25, -29.38771324), (7, -30.975426481), (9.75, -29.38771324), (9.75, -26.21228676), align=None)
    extrude(amount=-CUT_EXTRUDE11_DEPTH, mode=Mode.SUBTRACT)


solid = part.part
